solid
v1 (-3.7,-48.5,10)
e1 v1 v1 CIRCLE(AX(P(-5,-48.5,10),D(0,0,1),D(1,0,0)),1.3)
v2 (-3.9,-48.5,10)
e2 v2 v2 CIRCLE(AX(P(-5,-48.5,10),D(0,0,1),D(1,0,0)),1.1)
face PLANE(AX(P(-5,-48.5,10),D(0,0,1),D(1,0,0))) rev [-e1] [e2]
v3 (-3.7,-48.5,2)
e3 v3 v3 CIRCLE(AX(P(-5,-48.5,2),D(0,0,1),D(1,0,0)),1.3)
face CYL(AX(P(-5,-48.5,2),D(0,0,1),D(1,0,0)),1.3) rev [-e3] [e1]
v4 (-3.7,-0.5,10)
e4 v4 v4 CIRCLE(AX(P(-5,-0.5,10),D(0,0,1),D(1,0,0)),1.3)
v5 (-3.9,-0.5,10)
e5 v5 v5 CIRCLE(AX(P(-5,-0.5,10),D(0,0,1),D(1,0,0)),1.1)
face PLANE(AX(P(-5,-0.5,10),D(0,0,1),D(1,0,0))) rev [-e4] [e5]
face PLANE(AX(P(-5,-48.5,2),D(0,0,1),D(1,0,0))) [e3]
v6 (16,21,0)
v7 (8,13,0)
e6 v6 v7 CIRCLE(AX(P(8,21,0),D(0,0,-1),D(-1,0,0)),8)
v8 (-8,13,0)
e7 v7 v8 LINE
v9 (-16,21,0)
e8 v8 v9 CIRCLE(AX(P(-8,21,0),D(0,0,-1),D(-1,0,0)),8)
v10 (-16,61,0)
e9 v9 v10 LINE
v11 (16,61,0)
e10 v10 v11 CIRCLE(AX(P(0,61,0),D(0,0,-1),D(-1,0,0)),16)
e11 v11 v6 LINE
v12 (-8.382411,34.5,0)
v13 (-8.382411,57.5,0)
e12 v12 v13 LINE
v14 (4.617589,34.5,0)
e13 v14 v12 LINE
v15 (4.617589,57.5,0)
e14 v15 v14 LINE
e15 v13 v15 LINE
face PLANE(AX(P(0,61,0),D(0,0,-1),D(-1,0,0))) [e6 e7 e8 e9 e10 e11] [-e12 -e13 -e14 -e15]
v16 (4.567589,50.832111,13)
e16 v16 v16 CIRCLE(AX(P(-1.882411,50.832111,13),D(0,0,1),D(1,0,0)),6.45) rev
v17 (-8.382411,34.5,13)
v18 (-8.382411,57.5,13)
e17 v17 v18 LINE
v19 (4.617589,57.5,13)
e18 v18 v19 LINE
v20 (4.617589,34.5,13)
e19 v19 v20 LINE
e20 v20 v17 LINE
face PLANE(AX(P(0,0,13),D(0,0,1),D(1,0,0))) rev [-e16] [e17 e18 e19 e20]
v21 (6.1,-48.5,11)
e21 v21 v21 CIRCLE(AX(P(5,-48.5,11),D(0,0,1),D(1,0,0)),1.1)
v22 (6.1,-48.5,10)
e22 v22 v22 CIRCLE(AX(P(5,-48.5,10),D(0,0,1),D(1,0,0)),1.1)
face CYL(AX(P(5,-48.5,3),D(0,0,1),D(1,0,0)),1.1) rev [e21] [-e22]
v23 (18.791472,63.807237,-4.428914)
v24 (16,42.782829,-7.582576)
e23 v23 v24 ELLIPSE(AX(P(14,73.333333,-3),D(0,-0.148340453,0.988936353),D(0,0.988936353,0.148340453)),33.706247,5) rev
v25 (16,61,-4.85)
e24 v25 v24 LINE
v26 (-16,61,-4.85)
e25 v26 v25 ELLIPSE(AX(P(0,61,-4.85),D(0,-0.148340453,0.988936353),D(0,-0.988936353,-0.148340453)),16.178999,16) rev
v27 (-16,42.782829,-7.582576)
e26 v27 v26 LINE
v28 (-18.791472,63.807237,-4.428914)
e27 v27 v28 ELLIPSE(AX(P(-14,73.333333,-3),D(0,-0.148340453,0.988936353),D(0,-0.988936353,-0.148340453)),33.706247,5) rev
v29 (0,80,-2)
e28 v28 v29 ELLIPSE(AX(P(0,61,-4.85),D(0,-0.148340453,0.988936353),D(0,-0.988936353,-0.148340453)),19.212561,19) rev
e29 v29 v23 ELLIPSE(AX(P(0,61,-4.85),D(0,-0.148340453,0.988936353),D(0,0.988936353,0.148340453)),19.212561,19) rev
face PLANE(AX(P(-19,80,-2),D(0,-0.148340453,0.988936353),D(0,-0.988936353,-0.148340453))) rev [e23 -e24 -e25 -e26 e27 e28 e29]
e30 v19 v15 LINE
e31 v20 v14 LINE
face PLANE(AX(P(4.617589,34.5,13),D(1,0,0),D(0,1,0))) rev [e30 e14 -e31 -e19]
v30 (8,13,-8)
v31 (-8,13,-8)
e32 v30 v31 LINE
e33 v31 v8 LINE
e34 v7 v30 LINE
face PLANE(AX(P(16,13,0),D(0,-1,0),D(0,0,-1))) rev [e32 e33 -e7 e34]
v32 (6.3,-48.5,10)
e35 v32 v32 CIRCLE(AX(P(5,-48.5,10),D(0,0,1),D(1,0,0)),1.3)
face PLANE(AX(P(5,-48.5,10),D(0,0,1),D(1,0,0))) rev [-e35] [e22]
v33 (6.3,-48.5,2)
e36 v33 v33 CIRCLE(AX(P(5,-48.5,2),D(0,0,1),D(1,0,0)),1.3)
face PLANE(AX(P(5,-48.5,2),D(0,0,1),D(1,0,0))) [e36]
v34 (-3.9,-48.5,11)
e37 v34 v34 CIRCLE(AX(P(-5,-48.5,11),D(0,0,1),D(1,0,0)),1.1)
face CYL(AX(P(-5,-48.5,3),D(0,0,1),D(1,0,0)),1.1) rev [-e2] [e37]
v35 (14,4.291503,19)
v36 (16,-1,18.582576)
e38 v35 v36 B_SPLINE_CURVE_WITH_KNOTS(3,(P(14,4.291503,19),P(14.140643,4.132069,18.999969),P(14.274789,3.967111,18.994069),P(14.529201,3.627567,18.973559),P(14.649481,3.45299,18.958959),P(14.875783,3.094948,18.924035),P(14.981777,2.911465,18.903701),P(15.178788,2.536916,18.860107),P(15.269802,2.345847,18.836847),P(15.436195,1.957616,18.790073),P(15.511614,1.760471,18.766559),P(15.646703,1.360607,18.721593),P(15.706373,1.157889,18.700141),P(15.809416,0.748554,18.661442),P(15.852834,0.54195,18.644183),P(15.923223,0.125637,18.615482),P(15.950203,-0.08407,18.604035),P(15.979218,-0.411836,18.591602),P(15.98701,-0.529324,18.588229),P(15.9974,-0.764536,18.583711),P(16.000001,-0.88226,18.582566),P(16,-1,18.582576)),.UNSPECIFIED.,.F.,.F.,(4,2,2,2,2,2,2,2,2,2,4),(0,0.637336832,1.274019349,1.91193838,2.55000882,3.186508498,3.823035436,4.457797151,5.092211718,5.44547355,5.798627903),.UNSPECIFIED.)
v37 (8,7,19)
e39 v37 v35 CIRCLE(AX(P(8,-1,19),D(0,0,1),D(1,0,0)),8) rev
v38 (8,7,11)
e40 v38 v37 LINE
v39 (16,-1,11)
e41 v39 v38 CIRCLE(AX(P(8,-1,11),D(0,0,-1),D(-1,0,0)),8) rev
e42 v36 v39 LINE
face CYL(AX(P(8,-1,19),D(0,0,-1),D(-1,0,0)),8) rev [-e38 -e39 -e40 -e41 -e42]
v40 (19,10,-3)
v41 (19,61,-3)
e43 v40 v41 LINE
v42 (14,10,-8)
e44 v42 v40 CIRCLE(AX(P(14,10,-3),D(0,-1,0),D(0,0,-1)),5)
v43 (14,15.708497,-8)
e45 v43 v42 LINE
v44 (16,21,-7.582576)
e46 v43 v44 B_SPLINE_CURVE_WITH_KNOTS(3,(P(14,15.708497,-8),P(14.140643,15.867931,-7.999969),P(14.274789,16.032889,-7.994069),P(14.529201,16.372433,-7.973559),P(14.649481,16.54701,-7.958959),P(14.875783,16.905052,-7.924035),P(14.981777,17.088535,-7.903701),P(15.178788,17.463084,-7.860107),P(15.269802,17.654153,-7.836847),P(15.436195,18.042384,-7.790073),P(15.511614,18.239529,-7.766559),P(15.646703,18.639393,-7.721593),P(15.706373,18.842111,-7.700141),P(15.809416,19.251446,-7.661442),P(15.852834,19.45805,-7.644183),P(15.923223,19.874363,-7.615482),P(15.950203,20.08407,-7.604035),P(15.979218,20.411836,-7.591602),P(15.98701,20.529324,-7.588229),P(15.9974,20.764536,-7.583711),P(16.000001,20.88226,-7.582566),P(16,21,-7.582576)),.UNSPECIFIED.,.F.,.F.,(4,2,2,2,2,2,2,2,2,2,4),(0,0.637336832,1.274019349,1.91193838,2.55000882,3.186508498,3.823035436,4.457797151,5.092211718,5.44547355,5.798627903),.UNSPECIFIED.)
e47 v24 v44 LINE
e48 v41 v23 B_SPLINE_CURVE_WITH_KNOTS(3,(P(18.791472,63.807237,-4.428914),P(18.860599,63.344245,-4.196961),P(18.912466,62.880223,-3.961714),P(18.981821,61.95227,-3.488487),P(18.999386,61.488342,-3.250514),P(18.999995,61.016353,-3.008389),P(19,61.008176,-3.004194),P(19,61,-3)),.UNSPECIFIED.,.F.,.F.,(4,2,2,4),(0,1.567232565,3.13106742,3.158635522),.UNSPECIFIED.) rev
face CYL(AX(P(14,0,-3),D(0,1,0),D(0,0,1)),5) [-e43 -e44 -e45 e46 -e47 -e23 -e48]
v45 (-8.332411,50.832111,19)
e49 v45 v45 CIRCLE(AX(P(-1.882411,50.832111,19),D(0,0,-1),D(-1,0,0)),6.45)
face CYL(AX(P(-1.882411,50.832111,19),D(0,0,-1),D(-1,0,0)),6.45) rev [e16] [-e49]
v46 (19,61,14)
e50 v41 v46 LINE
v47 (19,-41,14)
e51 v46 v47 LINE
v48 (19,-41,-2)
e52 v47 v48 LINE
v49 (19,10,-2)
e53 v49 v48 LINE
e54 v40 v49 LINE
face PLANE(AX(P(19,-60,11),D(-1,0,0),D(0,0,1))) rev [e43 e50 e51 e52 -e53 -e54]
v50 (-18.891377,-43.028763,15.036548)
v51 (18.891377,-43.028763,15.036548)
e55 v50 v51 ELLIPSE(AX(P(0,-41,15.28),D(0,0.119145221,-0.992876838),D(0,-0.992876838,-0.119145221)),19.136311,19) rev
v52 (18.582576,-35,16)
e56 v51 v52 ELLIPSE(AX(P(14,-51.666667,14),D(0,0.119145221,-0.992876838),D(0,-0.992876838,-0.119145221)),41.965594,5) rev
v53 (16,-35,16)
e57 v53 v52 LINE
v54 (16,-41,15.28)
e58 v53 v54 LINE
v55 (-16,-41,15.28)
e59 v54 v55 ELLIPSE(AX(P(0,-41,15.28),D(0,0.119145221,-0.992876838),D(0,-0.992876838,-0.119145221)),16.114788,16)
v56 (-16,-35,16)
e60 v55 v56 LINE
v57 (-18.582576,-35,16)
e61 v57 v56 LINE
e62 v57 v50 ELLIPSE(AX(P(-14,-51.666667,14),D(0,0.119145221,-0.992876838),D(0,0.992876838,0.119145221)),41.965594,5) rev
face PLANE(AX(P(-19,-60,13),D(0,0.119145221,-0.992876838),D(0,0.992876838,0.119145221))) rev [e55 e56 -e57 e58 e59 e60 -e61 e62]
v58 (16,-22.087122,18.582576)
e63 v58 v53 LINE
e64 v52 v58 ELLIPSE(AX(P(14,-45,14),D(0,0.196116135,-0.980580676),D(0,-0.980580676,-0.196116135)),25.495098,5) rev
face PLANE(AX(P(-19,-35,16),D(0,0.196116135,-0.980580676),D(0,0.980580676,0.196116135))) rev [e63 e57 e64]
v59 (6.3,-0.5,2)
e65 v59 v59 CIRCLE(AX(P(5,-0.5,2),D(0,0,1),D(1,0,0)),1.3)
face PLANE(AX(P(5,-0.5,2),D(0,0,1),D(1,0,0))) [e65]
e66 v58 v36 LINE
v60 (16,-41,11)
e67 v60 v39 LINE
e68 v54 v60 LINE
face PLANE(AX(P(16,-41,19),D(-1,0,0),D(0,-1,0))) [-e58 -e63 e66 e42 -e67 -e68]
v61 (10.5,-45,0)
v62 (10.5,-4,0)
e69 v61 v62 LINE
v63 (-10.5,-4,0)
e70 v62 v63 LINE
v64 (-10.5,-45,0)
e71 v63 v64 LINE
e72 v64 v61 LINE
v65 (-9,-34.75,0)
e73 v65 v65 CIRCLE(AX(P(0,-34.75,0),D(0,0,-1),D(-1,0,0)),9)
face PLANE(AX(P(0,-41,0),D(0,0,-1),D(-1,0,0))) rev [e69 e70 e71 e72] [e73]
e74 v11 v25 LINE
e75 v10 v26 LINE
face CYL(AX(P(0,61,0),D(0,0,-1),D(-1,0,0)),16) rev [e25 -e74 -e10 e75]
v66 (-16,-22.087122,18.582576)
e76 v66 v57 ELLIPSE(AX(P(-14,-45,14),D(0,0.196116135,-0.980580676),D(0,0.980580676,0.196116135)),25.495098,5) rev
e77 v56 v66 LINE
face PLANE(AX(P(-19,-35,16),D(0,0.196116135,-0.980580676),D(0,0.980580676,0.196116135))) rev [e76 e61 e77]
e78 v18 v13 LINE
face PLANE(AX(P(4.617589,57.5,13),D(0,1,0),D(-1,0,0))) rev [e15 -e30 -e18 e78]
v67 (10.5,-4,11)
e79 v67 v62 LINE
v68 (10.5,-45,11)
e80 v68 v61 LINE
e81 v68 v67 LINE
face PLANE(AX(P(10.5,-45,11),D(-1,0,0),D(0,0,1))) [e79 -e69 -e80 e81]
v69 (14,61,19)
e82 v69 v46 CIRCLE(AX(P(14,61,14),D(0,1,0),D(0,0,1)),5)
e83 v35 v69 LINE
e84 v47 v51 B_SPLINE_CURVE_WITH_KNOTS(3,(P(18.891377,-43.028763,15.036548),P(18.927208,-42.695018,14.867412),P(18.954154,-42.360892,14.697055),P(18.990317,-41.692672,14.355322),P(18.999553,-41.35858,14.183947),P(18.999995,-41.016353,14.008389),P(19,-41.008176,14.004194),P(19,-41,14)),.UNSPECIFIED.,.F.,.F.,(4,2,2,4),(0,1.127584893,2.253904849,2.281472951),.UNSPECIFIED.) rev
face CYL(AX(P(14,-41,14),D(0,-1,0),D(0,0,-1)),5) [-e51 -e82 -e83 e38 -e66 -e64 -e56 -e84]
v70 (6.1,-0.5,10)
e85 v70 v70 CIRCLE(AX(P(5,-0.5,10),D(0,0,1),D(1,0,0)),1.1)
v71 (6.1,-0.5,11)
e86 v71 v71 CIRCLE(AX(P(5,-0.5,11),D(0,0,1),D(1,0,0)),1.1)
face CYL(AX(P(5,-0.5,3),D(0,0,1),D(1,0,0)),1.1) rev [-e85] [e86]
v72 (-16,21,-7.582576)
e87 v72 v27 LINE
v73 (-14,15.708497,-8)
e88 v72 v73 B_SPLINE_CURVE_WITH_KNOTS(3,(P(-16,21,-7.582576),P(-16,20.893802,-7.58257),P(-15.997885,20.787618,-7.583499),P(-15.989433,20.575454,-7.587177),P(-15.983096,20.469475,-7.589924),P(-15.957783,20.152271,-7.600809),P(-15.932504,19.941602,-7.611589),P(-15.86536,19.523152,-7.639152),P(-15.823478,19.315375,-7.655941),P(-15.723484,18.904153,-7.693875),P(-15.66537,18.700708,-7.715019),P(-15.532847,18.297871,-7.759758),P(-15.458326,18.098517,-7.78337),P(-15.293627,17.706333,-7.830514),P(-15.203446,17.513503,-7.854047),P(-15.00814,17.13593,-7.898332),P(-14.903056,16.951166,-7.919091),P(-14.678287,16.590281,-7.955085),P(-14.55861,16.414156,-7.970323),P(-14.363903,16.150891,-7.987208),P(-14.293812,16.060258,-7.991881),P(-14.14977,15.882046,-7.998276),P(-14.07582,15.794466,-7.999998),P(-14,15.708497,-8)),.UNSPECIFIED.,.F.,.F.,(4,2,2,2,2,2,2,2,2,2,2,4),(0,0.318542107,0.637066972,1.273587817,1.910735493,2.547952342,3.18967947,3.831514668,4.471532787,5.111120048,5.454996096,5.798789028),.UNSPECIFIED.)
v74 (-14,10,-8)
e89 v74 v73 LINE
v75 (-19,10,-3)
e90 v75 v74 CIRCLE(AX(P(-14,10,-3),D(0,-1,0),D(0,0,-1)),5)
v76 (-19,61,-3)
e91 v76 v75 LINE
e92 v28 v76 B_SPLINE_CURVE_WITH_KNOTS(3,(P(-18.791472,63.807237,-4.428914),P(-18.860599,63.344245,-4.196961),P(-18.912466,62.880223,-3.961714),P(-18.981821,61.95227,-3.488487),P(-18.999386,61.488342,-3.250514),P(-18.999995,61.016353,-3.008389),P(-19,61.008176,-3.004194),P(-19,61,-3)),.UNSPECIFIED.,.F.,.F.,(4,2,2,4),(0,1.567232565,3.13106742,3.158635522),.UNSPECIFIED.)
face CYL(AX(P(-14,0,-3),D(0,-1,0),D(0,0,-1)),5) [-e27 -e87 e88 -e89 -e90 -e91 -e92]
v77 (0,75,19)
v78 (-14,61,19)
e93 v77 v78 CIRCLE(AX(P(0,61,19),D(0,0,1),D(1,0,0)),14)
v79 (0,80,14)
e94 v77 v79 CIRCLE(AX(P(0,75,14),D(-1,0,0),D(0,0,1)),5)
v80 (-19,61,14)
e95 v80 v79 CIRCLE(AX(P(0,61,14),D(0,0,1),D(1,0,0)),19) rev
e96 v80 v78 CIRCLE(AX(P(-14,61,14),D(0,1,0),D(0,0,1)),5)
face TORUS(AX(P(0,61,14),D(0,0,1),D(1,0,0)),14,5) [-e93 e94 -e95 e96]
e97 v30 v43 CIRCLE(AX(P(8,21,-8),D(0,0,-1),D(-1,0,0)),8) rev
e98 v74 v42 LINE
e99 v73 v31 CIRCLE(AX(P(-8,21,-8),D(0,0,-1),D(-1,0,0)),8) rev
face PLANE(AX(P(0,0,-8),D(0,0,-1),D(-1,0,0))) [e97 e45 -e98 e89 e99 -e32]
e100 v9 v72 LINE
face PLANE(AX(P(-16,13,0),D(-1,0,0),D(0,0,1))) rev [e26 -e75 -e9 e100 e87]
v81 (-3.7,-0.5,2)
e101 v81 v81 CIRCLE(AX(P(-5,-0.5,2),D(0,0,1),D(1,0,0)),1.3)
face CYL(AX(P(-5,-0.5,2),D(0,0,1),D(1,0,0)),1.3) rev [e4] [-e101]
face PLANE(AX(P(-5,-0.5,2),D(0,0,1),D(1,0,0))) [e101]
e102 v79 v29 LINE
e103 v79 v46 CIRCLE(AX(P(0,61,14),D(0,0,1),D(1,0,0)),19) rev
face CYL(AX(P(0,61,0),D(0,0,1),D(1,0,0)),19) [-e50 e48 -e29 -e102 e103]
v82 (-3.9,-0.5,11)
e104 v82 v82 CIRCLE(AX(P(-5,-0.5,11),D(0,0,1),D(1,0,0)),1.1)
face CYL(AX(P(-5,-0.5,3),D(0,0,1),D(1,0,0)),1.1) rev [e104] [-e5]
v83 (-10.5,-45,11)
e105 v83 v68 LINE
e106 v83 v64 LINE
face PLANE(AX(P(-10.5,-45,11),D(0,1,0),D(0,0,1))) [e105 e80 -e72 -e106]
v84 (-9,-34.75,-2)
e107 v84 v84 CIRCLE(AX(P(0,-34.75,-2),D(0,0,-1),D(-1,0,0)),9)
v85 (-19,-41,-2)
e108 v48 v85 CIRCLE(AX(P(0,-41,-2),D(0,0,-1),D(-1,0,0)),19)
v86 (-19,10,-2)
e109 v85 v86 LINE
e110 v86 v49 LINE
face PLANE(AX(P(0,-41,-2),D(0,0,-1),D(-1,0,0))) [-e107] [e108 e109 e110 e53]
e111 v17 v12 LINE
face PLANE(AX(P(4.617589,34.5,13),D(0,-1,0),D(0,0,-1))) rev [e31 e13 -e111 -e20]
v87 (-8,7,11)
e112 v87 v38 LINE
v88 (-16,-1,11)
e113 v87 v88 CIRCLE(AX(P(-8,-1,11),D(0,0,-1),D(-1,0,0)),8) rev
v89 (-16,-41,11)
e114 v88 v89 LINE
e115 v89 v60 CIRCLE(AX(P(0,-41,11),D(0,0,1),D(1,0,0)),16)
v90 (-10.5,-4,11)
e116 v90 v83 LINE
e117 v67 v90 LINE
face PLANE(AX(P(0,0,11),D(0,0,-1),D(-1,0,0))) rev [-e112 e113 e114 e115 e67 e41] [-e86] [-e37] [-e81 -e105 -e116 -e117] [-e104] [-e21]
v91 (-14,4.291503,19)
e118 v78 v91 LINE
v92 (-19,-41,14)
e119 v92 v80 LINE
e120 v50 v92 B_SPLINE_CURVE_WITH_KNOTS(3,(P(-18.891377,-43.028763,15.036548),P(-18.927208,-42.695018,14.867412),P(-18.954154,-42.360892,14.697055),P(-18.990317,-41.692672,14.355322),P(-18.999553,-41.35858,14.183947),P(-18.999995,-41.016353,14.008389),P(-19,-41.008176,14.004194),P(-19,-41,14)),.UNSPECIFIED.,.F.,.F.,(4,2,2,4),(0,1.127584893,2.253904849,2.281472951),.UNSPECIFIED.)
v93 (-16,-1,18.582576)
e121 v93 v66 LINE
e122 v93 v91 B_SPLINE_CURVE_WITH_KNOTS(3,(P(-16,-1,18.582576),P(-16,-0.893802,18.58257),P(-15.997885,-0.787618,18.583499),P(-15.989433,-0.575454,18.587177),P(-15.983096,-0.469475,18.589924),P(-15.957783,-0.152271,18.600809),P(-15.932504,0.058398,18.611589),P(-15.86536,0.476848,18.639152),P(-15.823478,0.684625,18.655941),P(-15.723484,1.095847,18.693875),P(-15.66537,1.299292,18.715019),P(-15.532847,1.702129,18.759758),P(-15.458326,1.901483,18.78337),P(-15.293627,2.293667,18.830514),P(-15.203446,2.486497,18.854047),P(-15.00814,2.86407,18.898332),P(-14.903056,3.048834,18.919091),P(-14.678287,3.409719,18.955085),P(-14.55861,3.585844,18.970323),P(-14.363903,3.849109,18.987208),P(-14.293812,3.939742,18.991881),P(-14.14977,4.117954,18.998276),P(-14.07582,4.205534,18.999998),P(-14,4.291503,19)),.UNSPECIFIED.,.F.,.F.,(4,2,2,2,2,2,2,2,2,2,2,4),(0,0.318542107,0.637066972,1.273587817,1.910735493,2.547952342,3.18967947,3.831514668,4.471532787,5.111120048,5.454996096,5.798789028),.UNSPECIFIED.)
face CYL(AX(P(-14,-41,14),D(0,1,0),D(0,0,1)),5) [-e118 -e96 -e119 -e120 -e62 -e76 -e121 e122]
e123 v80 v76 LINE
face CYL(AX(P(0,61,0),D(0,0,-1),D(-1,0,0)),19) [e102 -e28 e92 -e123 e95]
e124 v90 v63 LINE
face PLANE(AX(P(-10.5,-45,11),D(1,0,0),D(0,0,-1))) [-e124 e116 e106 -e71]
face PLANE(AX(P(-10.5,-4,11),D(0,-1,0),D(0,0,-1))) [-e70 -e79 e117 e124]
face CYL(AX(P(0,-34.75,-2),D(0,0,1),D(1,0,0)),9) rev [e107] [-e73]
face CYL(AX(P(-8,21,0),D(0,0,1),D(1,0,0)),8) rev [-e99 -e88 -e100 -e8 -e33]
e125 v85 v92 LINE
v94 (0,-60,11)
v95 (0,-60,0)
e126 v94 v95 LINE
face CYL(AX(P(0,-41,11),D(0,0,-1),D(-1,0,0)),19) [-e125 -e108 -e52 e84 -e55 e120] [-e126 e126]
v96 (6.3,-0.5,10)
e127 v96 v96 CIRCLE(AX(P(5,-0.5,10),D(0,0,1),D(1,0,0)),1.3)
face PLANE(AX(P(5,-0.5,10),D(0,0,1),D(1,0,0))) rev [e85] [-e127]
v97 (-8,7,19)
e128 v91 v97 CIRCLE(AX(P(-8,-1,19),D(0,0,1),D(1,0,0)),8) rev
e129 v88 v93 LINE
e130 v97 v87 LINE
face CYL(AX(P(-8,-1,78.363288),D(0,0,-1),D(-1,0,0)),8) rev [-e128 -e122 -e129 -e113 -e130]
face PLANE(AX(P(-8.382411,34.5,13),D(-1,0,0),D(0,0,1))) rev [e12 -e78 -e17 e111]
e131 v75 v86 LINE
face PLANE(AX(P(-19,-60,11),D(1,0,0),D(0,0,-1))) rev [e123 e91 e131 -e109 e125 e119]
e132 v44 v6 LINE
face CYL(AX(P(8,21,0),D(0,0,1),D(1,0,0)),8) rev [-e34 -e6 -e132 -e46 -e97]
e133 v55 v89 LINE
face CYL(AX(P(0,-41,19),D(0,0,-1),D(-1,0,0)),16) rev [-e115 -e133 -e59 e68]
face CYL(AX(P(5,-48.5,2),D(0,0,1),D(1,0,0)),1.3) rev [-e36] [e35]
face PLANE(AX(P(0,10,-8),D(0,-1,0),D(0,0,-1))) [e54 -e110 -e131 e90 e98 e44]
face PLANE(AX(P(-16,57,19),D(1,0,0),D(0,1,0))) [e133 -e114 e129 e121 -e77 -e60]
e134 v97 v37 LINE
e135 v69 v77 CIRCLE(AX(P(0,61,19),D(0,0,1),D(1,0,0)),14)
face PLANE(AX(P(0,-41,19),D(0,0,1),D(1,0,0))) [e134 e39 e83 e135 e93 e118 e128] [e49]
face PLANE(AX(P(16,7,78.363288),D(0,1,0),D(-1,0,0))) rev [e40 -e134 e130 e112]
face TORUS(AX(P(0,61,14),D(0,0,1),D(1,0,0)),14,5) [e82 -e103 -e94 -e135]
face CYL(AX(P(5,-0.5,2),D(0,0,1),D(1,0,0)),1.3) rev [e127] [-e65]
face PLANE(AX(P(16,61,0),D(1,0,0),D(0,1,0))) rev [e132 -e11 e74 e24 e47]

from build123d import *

# Parameters (mm, degrees)
SKETCH1_W               = 38
SKETCH1_H               = 120
SKETCH1_W_2             = 21
SKETCH1_H_2             = 41
BOSS_EXTRUDE1_DEPTH     = 11
SKETCH3_R               = 1.3
CUT_EXTRUDE1_DEPTH      = 8
FILLET3_R               = 19
BOSS_EXTRUDE2_DEPTH     = 8
CUT_EXTRUDE2_DEPTH      = 66.741919656
CUT_EXTRUDE2_DEPTH_BACK = 66.741919656
SKETCH7_W               = 32
SKETCH7_H               = 50
BOSS_EXTRUDE4_DEPTH     = 8
SKETCH8_W               = 38
SKETCH8_H               = 50
BOSS_EXTRUDE5_DEPTH     = 8
BOSS_EXTRUDE10_START    = 2
SKETCH27_R              = 9
BOSS_EXTRUDE10_DEPTH    = 2
SKETCH28_W              = 38
SKETCH28_H              = 27
BOSS_EXTRUDE11_DEPTH    = 20
FILLET4_R               = 19
CUT_EXTRUDE14_DEPTH     = 8
CUT_EXTRUDE18_DEPTH     = 91.581455056
FILLET7_R               = 5
SKETCH35_R              = 1.1
CUT_EXTRUDE20_DEPTH     = 8
FILLET8_R               = 8
SKETCH36_R              = 6.45
CUT_EXTRUDE21_DEPTH     = 85.391942883
SKETCH30_W              = 13
SKETCH30_H              = 23
CUT_EXTRUDE22_DEPTH     = 13


# Some blends are built 0.0001 mm under size
with BuildPart() as part:
    # Sketch1 → Boss-Extrude1 (new body)
    with BuildSketch(Plane.XY):
        Rectangle(SKETCH1_W, SKETCH1_H)
        with Locations((0, -24.5)):
            Rectangle(SKETCH1_W_2, SKETCH1_H_2, mode=Mode.SUBTRACT)
    extrude(amount=BOSS_EXTRUDE1_DEPTH)

    # Sketch3 → Cut-Extrude1 (cut)
    with BuildSketch(Plane.XY.offset(10)):
        with Locations((-5, -0.5)):
            Circle(SKETCH3_R)
        with Locations((5, -0.5)):
            Circle(SKETCH3_R)
        with Locations((5, -48.5)):
            Circle(SKETCH3_R)
        with Locations((-5, -48.5)):
            Circle(SKETCH3_R)
    extrude(amount=-CUT_EXTRUDE1_DEPTH, mode=Mode.SUBTRACT)

    # Fillet3
    fillet3_edges = [part.edges().sort_by_distance(p)[0] for p in [
        (19, -60, 5.5),
        (-19, -60, 5.5),
    ]]
    fillet(fillet3_edges, radius=FILLET3_R - 0.0001)  # a hair under: the kernel refuses the full size

    # Sketch4 → Boss-Extrude2 (add)
    with BuildSketch(Plane.XY.offset(11)):
        with BuildLine():
            Line((19, -41), (19, 60))
            Line((19, 60), (-19, 60))
            Line((-19, 60), (-19, -41))
            ThreePointArc((-19, -41), (-13.435028843, -54.435028843), (0, -60))
            ThreePointArc((0, -60), (13.435028843, -54.435028843), (19, -41))
        make_face()
        with BuildLine():
            Line((16, -41), (16, 57))
            Line((16, 57), (-16, 57))
            Line((-16, 57), (-16, -41))
            ThreePointArc((-16, -41), (-11.313708499, -52.313708499), (0, -57))
            ThreePointArc((0, -57), (11.313708499, -52.313708499), (16, -41))
        make_face(mode=Mode.SUBTRACT)
    extrude(amount=BOSS_EXTRUDE2_DEPTH)

    # Sketch6 → Cut-Extrude2 (cut, two sides: drawn at the far end of the back side and taken through both)
    with BuildSketch(Plane(origin=(0, 0, 0), x_dir=(0, 0, -1), z_dir=(1, 0, 0)).offset(-CUT_EXTRUDE2_DEPTH_BACK)):
        Polygon((-13, -60), (-16, -35), (-19, -20), (-19, -60), align=None)
    extrude(amount=CUT_EXTRUDE2_DEPTH + CUT_EXTRUDE2_DEPTH_BACK, mode=Mode.SUBTRACT)

    # Sketch7 → Boss-Extrude4 (add)
    with BuildSketch(Plane.XY.offset(11)):
        with Locations((0, 32)):
            Rectangle(SKETCH7_W, SKETCH7_H)
    extrude(amount=BOSS_EXTRUDE4_DEPTH)

    # Sketch8 → Boss-Extrude5 (add)
    with BuildSketch(Plane(origin=(0, 0, 0), x_dir=(-1, 0, 0), z_dir=(0, 0, -1))):
        with Locations((0, 35)):
            Rectangle(SKETCH8_W, SKETCH8_H)
    extrude(amount=BOSS_EXTRUDE5_DEPTH)

    # Sketch27 → Boss-Extrude10 (add)
    with BuildSketch(Plane(origin=(0, 0, 0), x_dir=(-1, 0, 0), z_dir=(0, 0, -1)).offset(BOSS_EXTRUDE10_START)):
        with BuildLine():
            Line((19, -41), (19, 10))
            Line((19, 10), (-19, 10))
            Line((-19, 10), (-19, -41))
            ThreePointArc((-19, -41), (-13.435028843, -54.435028843), (0, -60))
            ThreePointArc((0, -60), (13.435028843, -54.435028843), (19, -41))
        make_face()
        with Locations((0, -34.75)):
            Circle(SKETCH27_R, mode=Mode.SUBTRACT)
    extrude(amount=-BOSS_EXTRUDE10_DEPTH)

    # Sketch28 → Boss-Extrude11 (add)
    with BuildSketch(Plane(origin=(0, 60, 0), x_dir=(1, 0, 0), z_dir=(0, 1, 0))):
        with Locations((0, -5.5)):
            Rectangle(SKETCH28_W, SKETCH28_H)
    extrude(amount=BOSS_EXTRUDE11_DEPTH)

    # Fillet4
    fillet4_edges = [part.edges().sort_by_distance(p)[0] for p in [
        (-19, 80, 5.5),
        (19, 80, 5.5),
    ]]
    fillet(fillet4_edges, radius=FILLET4_R - 0.0001)  # a hair under: the kernel refuses the full size

    # Sketch29 → Cut-Extrude14 (cut)
    with BuildSketch(Plane(origin=(0, 0, -8), x_dir=(-1, 0, 0), z_dir=(0, 0, -1))):
        with BuildLine():
            Line((16, 13), (16, 61))
            ThreePointArc((16, 61), (11.313708499, 72.313708499), (0, 77))
            ThreePointArc((0, 77), (-11.313708499, 72.313708499), (-16, 61))
            Line((-16, 61), (-16, 13))
            Line((-16, 13), (16, 13))
        make_face()
    extrude(amount=-CUT_EXTRUDE14_DEPTH, mode=Mode.SUBTRACT)

    # Sketch33 → Cut-Extrude18 (cut, through all)
    with BuildSketch(Plane(origin=(19, 0, 0), x_dir=(0, 0, -1), z_dir=(1, 0, 0))):
        Polygon((2, 80), (8, 40), (8, 80), align=None)
    extrude(amount=-CUT_EXTRUDE18_DEPTH, mode=Mode.SUBTRACT)

    # Fillet7
    # the kernel refuses this fillet: 5 mm, written as the material it takes off along each edge
    with BuildSketch(Plane(origin=(-19, 77.5, -8), x_dir=(0, 0, 1), z_dir=(0, -1, 0)), Plane(origin=(19, -2.5, -8), x_dir=(0, 0, 1), z_dir=(0, 1, 0))) as fillet7_piece_1:
        with BuildLine():
            CenterArc((FILLET7_R, -FILLET7_R), FILLET7_R, 90, 90)
            Line((0, -FILLET7_R), (0, 0))
            Line((0, 0), (FILLET7_R, 0))
        make_face()
    extrude(amount=80, mode=Mode.SUBTRACT)
    with BuildSketch(Plane(origin=(-19, -57.5, 19), x_dir=(1, 0, 0), z_dir=(0, 1, 0)), Plane(origin=(19, 61.0001, 19), x_dir=(-1, 0, 0), z_dir=(0, -1, 0))) as fillet7_piece_2:
        with BuildLine():
            CenterArc((FILLET7_R, FILLET7_R), FILLET7_R, 180, 90)
            Line((0, FILLET7_R), (0, 0))
            Line((0, 0), (FILLET7_R, 0))
        make_face()
    extrude(amount=118.5001, mode=Mode.SUBTRACT)
    with BuildSketch(Plane(origin=(0.0001, 61.0001, 19), x_dir=(0, 1, 0), z_dir=(-1, 0, 0))) as fillet7_piece_3:
        with BuildLine():
            CenterArc((18.9999 - FILLET7_R, FILLET7_R), FILLET7_R, 270, 90)
            Line((18.9999, FILLET7_R), (18.9999, 0))
            Line((18.9999, 0), (18.9999 - FILLET7_R, 0))
        make_face()
    revolve(axis=Axis((0.0001, 61.0001, 19), (0, 0, -1)), revolution_arc=90, mode=Mode.SUBTRACT)
    with BuildSketch(Plane(origin=(-0.0001, 61.0001, 19), x_dir=(0, 1, 0), z_dir=(1, 0, 0))) as fillet7_piece_4:
        with BuildLine():
            CenterArc((18.9999 - FILLET7_R, -FILLET7_R), FILLET7_R, 0, 90)
            Line((18.9999, -FILLET7_R), (18.9999, 0))
            Line((18.9999, 0), (18.9999 - FILLET7_R, 0))
        make_face()
    revolve(axis=Axis((-0.0001, 61.0001, 19), (0, 0, 1)), revolution_arc=90, mode=Mode.SUBTRACT)
    with BuildSketch(Plane(origin=(-0.0001, 80, 19), x_dir=(0, -1, 0), z_dir=(1, 0, 0))) as fillet7_piece_5:
        with BuildLine():
            CenterArc((FILLET7_R, FILLET7_R), FILLET7_R, 180, 90)
            Line((0, FILLET7_R), (0, 0))
            Line((0, 0), (FILLET7_R, 0))
        make_face()
    extrude(amount=0.0002, mode=Mode.SUBTRACT)

    # Sketch35 → Cut-Extrude20 (cut)
    with BuildSketch(Plane.XY.offset(11)):
        with Locations((-5, -0.5)):
            Circle(SKETCH35_R)
        with Locations((5, -0.5)):
            Circle(SKETCH35_R)
        with Locations((5, -48.5)):
            Circle(SKETCH35_R)
        with Locations((-5, -48.5)):
            Circle(SKETCH35_R)
    extrude(amount=-CUT_EXTRUDE20_DEPTH, mode=Mode.SUBTRACT)

    # Fillet8
    fillet8_edges = [part.edges().sort_by_distance(p)[0] for p in [
        (-16, 7, 14.791287847),
        (16, 7, 14.791287847),
        (16, 13, -3.791287847),
        (-16, 13, -3.791287847),
    ]]
    fillet(fillet8_edges, radius=FILLET8_R)

    # Sketch36 → Cut-Extrude21 (cut, through all)
    with BuildSketch(Plane(origin=(0, 0, 0), x_dir=(-1, 0, 0), z_dir=(0, 0, -1))):
        with Locations((1.882410705, 50.832111393)):
            Circle(SKETCH36_R)
    extrude(amount=-CUT_EXTRUDE21_DEPTH, mode=Mode.SUBTRACT)

    # Sketch30 → Cut-Extrude22 (cut)
    with BuildSketch(Plane(origin=(0, 0, 0), x_dir=(-1, 0, 0), z_dir=(0, 0, -1))):
        with Locations((1.882410705, 46)):
            Rectangle(SKETCH30_W, SKETCH30_H)
    extrude(amount=-CUT_EXTRUDE22_DEPTH, mode=Mode.SUBTRACT)


solid = part.part
